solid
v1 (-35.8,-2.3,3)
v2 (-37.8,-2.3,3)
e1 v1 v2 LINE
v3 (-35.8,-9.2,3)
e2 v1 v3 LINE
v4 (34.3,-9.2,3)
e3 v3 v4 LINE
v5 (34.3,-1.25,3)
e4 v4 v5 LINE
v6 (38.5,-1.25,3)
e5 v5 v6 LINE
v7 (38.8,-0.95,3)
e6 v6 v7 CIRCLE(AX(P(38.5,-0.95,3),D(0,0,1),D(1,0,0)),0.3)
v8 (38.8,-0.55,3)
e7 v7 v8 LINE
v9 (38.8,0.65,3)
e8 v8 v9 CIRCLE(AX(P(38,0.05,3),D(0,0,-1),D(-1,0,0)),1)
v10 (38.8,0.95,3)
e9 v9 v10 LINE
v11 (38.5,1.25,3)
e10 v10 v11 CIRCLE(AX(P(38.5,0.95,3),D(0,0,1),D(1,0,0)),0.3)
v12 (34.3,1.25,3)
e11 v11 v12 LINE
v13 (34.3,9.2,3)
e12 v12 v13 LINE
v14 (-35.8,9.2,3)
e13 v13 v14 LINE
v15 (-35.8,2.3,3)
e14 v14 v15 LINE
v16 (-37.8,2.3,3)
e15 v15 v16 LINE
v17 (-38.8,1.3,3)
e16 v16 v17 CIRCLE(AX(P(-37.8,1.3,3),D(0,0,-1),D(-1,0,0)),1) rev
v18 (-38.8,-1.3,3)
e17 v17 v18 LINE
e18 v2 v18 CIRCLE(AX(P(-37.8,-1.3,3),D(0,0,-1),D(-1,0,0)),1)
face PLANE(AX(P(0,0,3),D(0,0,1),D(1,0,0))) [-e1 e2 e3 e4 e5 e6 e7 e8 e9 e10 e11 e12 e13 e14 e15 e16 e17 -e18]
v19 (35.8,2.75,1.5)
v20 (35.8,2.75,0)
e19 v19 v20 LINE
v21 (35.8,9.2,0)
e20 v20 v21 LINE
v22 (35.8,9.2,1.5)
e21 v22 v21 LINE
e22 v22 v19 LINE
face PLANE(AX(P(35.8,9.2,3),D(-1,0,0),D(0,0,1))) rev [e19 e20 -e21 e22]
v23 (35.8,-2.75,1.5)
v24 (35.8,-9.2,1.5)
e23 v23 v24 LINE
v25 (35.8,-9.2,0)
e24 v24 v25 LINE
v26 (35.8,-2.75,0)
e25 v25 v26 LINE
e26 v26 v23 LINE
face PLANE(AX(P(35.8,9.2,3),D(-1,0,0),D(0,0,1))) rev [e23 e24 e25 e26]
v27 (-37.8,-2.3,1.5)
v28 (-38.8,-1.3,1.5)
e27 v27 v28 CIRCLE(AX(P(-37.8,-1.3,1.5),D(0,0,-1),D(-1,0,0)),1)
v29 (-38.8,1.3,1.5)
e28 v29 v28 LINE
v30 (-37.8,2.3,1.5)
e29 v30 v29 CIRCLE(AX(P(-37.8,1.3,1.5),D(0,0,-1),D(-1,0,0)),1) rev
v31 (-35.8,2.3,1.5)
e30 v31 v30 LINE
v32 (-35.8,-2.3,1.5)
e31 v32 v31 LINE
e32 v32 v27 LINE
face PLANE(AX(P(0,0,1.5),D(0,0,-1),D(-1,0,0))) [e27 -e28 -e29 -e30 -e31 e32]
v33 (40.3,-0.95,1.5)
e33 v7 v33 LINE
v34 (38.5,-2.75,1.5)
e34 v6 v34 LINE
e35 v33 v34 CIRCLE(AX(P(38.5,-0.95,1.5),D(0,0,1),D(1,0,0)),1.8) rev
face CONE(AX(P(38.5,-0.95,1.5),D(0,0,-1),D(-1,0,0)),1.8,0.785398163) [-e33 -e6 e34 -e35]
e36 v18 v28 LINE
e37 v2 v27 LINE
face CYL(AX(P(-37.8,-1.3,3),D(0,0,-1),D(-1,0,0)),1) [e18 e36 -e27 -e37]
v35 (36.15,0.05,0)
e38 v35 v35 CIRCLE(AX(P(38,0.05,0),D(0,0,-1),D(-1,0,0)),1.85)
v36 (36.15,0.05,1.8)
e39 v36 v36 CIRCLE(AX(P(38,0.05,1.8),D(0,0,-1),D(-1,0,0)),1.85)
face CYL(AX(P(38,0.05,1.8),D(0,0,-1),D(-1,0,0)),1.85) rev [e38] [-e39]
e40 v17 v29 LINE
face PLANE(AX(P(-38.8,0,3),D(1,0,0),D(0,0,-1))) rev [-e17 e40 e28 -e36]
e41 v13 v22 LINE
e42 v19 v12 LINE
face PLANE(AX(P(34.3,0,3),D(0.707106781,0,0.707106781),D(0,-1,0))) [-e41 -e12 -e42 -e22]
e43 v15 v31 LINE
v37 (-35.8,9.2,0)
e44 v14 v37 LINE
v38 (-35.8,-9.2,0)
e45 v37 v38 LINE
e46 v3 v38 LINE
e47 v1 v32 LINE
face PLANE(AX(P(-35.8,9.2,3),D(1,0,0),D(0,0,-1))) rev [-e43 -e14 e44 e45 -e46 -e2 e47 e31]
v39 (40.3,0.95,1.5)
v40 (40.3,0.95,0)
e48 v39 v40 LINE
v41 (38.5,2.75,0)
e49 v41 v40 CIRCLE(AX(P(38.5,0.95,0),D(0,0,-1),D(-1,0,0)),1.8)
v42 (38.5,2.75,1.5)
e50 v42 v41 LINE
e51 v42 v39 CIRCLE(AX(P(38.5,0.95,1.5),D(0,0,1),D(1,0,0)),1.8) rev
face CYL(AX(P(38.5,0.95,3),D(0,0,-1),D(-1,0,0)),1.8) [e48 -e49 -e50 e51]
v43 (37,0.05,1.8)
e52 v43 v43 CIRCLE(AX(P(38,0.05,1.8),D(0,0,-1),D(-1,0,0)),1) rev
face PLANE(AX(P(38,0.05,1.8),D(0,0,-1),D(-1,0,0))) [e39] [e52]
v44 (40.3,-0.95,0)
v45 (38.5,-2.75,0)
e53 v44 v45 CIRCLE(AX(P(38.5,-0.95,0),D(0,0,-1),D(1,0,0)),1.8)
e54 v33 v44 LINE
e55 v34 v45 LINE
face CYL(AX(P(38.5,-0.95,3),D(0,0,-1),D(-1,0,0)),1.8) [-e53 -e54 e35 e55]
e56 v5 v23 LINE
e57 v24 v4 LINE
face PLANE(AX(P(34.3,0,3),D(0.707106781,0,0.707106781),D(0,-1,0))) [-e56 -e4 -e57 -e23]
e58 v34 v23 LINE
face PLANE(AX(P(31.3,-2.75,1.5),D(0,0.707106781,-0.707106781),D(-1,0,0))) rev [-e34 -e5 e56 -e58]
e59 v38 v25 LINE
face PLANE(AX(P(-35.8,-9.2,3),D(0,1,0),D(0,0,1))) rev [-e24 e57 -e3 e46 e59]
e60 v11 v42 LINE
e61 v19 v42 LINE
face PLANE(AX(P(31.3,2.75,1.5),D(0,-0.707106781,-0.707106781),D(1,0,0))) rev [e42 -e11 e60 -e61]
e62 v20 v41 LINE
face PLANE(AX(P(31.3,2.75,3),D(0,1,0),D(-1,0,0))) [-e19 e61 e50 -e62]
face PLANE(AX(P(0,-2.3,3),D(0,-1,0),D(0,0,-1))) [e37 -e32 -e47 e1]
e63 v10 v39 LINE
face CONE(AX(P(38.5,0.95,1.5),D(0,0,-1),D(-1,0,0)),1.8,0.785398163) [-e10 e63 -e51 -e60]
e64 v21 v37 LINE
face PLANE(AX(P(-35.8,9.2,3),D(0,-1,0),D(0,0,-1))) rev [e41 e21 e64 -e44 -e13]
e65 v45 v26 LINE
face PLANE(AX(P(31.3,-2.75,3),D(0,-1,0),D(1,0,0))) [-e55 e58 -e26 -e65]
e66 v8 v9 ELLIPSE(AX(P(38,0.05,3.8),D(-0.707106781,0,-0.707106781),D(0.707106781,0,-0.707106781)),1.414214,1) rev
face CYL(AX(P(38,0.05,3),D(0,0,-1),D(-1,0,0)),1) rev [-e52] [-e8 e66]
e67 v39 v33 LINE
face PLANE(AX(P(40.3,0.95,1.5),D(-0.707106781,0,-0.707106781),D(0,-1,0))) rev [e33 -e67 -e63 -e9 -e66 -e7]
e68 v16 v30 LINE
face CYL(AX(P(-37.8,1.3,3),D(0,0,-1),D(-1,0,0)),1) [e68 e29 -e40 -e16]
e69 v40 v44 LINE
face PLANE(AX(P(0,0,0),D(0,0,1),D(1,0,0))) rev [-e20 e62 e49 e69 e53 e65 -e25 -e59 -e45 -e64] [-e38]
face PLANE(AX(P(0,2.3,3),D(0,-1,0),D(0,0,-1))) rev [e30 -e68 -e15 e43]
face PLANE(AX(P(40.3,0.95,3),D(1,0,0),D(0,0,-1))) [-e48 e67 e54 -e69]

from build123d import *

# Parameters (mm, degrees)
SKETCH_1_W          = 71.6
SKETCH_1_H          = 18.4
EXTRUDE_1_DEPTH     = 3
SKETCH_3_R          = 1
EXTRUDE_2_DEPTH     = 3
SKETCH_4_R          = 1.85
CUT_EXTRUDE_1_DEPTH = 1.8
EXTRUDE_START       = -1.5
EXTRUDE_3_DEPTH     = 1.5
CHAMFER_1_SIZE      = 1.5


with BuildPart() as part:
    # 草图1 → 凸台-拉伸1 (new body)
    with BuildSketch(Plane.XY):
        Rectangle(SKETCH_1_W, SKETCH_1_H)
    extrude(amount=EXTRUDE_1_DEPTH)

    # 草图3 → 凸台-拉伸2 (add)
    with BuildSketch(Plane(origin=(0, 0, 0), x_dir=(-1, 0, 0), z_dir=(0, 0, -1))):
        with BuildLine():
            Line((-31.3, 2.75), (-38.5, 2.75))
            ThreePointArc((-38.5, 2.75), (-39.772792206, 2.222792206), (-40.3, 0.95))
            Line((-40.3, 0.95), (-40.3, -0.95))
            ThreePointArc((-40.3, -0.95), (-39.772792206, -2.222792206), (-38.5, -2.75))
            Line((-38.5, -2.75), (-31.3, -2.75))
            Line((-31.3, -2.75), (-31.3, 2.75))
        make_face()
        with Locations((-38, 0.05)):
            Circle(SKETCH_3_R, mode=Mode.SUBTRACT)
    extrude(amount=-EXTRUDE_2_DEPTH)

    # 草图4 → 切除-拉伸1 (cut)
    with BuildSketch(Plane(origin=(0, 0, 0), x_dir=(-1, 0, 0), z_dir=(0, 0, -1))):
        with Locations((-38, 0.05)):
            Circle(SKETCH_4_R)
    extrude(amount=-CUT_EXTRUDE_1_DEPTH, mode=Mode.SUBTRACT)

    # 草图5 → 凸台-拉伸3 (add)
    with BuildSketch(Plane(origin=(0, 0, 0), x_dir=(-1, 0, 0), z_dir=(0, 0, -1)).offset(EXTRUDE_START)):
        with BuildLine():
            Line((37.8, 2.3), (35.8, 2.3))
            Line((35.8, 2.3), (35.8, -2.3))
            Line((35.8, -2.3), (37.8, -2.3))
            ThreePointArc((37.8, -2.3), (38.507106781, -2.007106781), (38.8, -1.3))
            Line((38.8, -1.3), (38.8, 1.3))
            ThreePointArc((38.8, 1.3), (38.507106781, 2.007106781), (37.8, 2.3))
        make_face()
    extrude(amount=-EXTRUDE_3_DEPTH)

    # 倒角1
    # the kernel refuses this chamfer: 1.5 mm, written as the material it takes off along each edge
    with BuildSketch(Plane(origin=(35.8, 13.057524482, 3), x_dir=(0.027495876610586778, 0, -0.9996219169112968), z_dir=(0, -1, 0))) as chamfer_1_piece_1:
        Polygon((CHAMFER_1_SIZE * 0.999621916911, -CHAMFER_1_SIZE * 0.0274958766106), (-CHAMFER_1_SIZE * 0.0274958766106, -CHAMFER_1_SIZE * 0.999621916911), (0, 0), align=None)
    extrude(amount=10.307524482, mode=Mode.SUBTRACT)
    with BuildSketch(Plane(origin=(38.5, -2.75, 3), x_dir=(0, 0.9996219169112968, 0.02749587661058649), z_dir=(-1, 0, 0)), Plane(origin=(35.8, 2.75, 3), x_dir=(0, -0.9996219169112968, 0.02749587661058649), z_dir=(1, 0, 0))) as chamfer_1_piece_2:
        Polygon((CHAMFER_1_SIZE * 0.999621916911, CHAMFER_1_SIZE * 0.0274958766106), (-CHAMFER_1_SIZE * 0.0274958766106, CHAMFER_1_SIZE * 0.999621916911), (0, 0), align=None)
    extrude(amount=2.7, mode=Mode.SUBTRACT)
    with BuildSketch(Plane(origin=(38.5, -0.95, 3), x_dir=(1, 0, 0), z_dir=(0, 1, 0))) as chamfer_1_piece_3:
        Polygon((1.8 - CHAMFER_1_SIZE, 0), (1.8, CHAMFER_1_SIZE), (1.8, 0), align=None)
    revolve(axis=Axis((38.5, -0.95, 3), (0, 0, -1)), revolution_arc=90, mode=Mode.SUBTRACT)
    with BuildSketch(Plane(origin=(40.3, 0.95, 3), x_dir=(-0.9996219169112968, 0, 0.02749587661058648), z_dir=(0, -1, 0))) as chamfer_1_piece_4:
        Polygon((CHAMFER_1_SIZE * 0.999621916911, CHAMFER_1_SIZE * 0.0274958766106), (-CHAMFER_1_SIZE * 0.0274958766106, CHAMFER_1_SIZE * 0.999621916911), (0, 0), align=None)
    extrude(amount=1.9, mode=Mode.SUBTRACT)
    with BuildSketch(Plane(origin=(38.5, 0.95, 3), x_dir=(0, 1, 0), z_dir=(-1, 0, 0))) as chamfer_1_piece_5:
        Polygon((1.8 - CHAMFER_1_SIZE, 0), (1.8, CHAMFER_1_SIZE), (1.8, 0), align=None)
    revolve(axis=Axis((38.5, 0.95, 3), (0, 0, -1)), revolution_arc=90, mode=Mode.SUBTRACT)
    with BuildSketch(Plane(origin=(35.8, -2.75, 3), x_dir=(-0.9996219169112968, 0, 0.02749587661058648), z_dir=(0, -1, 0))) as chamfer_1_piece_6:
        Polygon((CHAMFER_1_SIZE * 0.999621916911, CHAMFER_1_SIZE * 0.0274958766106), (-CHAMFER_1_SIZE * 0.0274958766106, CHAMFER_1_SIZE * 0.999621916911), (0, 0), align=None)
    extrude(amount=10.307524482, mode=Mode.SUBTRACT)
    with BuildSketch(Plane(origin=(35.8, 13.057524482, 3), x_dir=(0.027495876610586778, 0, -0.9996219169112968), z_dir=(0, -1, 0))) as chamfer_1_piece_7a_section:
        Polygon((CHAMFER_1_SIZE * 0.999621916911, -CHAMFER_1_SIZE * 0.0274958766106), (-CHAMFER_1_SIZE * 0.0274958766106, -CHAMFER_1_SIZE * 0.999621916911), (0, 0), align=None)
    chamfer_1_piece_7a = extrude(amount=14.165048964, mode=Mode.PRIVATE)
    chamfer_1_piece_7a = split(chamfer_1_piece_7a, bisect_by=Plane(origin=(35.30530956, 2.75, 2.50530956), z_dir=(0, -1, 0)), keep=Keep.TOP, mode=Mode.PRIVATE)
    with BuildSketch(Plane(origin=(31.942475518, 2.75, 3), x_dir=(0, -0.9996219169112968, 0.02749587661058649), z_dir=(1, 0, 0))) as chamfer_1_piece_7b_section:
        Polygon((CHAMFER_1_SIZE * 0.999621916911, CHAMFER_1_SIZE * 0.0274958766106), (-CHAMFER_1_SIZE * 0.0274958766106, CHAMFER_1_SIZE * 0.999621916911), (0, 0), align=None)
    chamfer_1_piece_7b = extrude(amount=6.557524482, mode=Mode.PRIVATE)
    chamfer_1_piece_7b = split(chamfer_1_piece_7b, bisect_by=Plane(origin=(35.8, 2.25530956, 2.50530956), z_dir=(-1, 0, 0)), keep=Keep.TOP, mode=Mode.PRIVATE)
    chamfer_1_piece_7 = chamfer_1_piece_7a & chamfer_1_piece_7b
    add(chamfer_1_piece_7, mode=Mode.SUBTRACT)
    with BuildSketch(Plane(origin=(38.5, -2.75, 3), x_dir=(0, 0.9996219169112968, 0.02749587661058649), z_dir=(-1, 0, 0))) as chamfer_1_piece_8a_section:
        Polygon((CHAMFER_1_SIZE * 0.999621916911, CHAMFER_1_SIZE * 0.0274958766106), (-CHAMFER_1_SIZE * 0.0274958766106, CHAMFER_1_SIZE * 0.999621916911), (0, 0), align=None)
    chamfer_1_piece_8a = extrude(amount=6.557524482, mode=Mode.PRIVATE)
    chamfer_1_piece_8a = split(chamfer_1_piece_8a, bisect_by=Plane(origin=(35.8, -2.25530956, 2.50530956), z_dir=(-1, 0, 0)), keep=Keep.TOP, mode=Mode.PRIVATE)
    with BuildSketch(Plane(origin=(35.8, 1.107524482, 3), x_dir=(-0.9996219169112968, 0, 0.02749587661058648), z_dir=(0, -1, 0))) as chamfer_1_piece_8b_section:
        Polygon((CHAMFER_1_SIZE * 0.999621916911, CHAMFER_1_SIZE * 0.0274958766106), (-CHAMFER_1_SIZE * 0.0274958766106, CHAMFER_1_SIZE * 0.999621916911), (0, 0), align=None)
    chamfer_1_piece_8b = extrude(amount=14.165048964, mode=Mode.PRIVATE)
    chamfer_1_piece_8b = split(chamfer_1_piece_8b, bisect_by=Plane(origin=(35.30530956, -2.75, 2.50530956), z_dir=(0, 1, 0)), keep=Keep.TOP, mode=Mode.PRIVATE)
    chamfer_1_piece_8 = chamfer_1_piece_8a & chamfer_1_piece_8b
    add(chamfer_1_piece_8, mode=Mode.SUBTRACT)


solid = part.part
